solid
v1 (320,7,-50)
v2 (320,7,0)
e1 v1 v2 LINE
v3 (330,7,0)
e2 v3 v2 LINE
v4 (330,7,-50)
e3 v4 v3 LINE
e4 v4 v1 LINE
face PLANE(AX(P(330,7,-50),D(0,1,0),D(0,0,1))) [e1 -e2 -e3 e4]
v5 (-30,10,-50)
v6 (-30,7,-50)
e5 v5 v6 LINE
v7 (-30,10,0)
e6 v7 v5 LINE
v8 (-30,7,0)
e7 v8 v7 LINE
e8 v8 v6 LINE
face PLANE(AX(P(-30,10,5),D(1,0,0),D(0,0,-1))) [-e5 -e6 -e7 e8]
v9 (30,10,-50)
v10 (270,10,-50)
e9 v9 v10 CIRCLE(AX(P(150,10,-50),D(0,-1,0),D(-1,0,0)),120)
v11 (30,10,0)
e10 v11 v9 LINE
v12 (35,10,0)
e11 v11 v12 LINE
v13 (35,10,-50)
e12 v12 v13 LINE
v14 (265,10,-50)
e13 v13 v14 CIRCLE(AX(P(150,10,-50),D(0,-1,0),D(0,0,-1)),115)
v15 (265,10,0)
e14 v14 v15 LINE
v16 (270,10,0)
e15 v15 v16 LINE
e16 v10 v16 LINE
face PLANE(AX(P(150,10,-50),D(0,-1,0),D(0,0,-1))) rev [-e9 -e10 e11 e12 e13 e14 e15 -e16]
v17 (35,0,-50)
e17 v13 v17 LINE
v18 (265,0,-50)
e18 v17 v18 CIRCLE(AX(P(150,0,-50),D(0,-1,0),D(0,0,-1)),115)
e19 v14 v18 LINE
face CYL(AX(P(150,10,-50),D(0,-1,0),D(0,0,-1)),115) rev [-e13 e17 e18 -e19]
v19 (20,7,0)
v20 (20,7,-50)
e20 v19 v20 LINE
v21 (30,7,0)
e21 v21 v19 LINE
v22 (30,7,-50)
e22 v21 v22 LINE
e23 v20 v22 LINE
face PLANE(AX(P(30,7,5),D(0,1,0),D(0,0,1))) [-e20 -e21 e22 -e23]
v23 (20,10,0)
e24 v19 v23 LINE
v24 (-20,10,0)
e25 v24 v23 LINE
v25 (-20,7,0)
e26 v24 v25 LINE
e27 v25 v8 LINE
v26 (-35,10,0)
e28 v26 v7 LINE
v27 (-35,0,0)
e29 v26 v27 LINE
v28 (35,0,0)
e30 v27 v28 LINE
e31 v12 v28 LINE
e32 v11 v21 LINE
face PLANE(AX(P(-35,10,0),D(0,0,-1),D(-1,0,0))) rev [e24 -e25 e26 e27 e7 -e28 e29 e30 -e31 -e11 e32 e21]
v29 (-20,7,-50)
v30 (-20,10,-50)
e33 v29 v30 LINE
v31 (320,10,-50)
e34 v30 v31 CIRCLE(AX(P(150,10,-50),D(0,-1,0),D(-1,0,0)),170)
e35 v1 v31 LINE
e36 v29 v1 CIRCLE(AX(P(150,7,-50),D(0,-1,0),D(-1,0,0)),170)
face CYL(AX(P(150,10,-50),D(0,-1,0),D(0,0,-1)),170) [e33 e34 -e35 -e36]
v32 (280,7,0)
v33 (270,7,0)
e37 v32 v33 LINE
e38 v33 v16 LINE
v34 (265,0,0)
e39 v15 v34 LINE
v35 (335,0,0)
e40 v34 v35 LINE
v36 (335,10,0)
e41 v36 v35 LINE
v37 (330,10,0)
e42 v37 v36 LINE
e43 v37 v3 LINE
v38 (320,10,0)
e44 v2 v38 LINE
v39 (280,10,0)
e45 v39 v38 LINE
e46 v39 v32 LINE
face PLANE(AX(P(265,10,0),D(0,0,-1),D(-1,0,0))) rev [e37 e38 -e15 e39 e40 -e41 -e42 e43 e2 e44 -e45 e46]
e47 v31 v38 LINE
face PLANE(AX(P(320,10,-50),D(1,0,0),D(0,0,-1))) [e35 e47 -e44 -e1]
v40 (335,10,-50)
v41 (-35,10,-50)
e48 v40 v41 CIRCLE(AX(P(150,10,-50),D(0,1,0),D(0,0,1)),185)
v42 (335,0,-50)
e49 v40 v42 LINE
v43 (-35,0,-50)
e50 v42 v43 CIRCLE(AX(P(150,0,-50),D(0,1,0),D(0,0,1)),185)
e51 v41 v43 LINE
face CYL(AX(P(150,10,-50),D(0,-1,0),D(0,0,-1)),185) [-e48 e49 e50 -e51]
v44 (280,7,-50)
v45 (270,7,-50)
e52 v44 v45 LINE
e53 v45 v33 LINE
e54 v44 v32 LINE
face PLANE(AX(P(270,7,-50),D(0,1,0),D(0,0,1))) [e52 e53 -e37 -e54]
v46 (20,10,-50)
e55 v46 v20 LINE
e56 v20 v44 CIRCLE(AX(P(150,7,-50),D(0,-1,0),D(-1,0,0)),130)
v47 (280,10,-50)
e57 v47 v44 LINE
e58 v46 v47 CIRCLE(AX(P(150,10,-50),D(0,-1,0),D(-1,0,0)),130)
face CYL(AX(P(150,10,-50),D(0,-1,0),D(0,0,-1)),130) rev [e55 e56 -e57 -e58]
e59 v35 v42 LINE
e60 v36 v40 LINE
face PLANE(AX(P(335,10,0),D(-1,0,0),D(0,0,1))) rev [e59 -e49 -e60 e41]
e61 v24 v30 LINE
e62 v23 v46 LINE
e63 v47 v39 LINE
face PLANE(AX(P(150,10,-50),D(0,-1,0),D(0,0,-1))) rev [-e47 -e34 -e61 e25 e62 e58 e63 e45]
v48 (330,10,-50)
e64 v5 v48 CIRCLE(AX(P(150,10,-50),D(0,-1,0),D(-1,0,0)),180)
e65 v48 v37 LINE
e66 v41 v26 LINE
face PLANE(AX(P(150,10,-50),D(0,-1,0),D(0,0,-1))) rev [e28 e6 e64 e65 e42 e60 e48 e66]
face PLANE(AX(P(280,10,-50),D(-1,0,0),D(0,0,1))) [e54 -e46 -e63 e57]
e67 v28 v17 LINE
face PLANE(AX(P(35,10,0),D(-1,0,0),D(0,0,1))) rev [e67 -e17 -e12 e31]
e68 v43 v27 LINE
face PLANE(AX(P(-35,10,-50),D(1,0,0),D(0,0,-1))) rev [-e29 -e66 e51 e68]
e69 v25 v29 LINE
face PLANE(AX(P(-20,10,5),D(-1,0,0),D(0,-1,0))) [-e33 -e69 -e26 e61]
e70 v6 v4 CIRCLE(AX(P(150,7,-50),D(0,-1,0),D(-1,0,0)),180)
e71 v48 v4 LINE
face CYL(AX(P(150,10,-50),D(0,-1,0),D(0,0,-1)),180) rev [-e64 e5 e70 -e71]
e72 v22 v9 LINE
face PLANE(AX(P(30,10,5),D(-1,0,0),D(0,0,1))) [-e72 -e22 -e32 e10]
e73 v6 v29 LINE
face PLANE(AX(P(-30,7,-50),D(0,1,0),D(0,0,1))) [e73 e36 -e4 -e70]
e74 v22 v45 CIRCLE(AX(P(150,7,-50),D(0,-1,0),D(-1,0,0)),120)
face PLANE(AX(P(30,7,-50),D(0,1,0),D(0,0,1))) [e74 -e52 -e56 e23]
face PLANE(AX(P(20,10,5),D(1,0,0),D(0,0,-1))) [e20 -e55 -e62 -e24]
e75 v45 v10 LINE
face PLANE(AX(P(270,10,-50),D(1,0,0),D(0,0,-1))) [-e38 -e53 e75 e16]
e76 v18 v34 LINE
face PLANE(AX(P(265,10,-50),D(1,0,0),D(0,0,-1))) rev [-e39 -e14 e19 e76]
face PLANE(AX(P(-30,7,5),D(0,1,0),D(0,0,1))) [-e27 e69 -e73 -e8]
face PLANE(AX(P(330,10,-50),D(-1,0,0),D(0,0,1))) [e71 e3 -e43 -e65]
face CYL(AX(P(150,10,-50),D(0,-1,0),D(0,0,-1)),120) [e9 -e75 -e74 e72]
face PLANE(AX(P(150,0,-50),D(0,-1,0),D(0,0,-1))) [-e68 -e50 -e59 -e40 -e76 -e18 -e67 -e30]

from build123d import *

# Parameters (mm, degrees)
BOSS_EXTRUDE1_DEPTH = 10
CUT_SWEEP1_START    = 7
CUT_SWEEP1_DEPTH    = 3


# Read off the part's stored shape, not the designer's step: Cut-Sweep1
with BuildPart() as part:
    # Sketch1 → Boss-Extrude1 (new body)
    with BuildSketch(Plane(origin=(0, 0, 0), x_dir=(1, 0, 0), z_dir=(0, 1, 0))):
        with BuildLine():
            Line((-35, 0), (35, 0))
            Line((35, 0), (35, 50))
            ThreePointArc((35, 50), (150, 165), (265, 50))
            Line((265, 50), (265, 0))
            Line((265, 0), (335, 0))
            Line((335, 0), (335, 50))
            ThreePointArc((335, 50), (150, 235), (-35, 50))
            Line((-35, 50), (-35, 0))
        make_face()
    extrude(amount=BOSS_EXTRUDE1_DEPTH)

    # Cut-Sweep1 outline → Cut-Sweep1 (cut)
    with BuildSketch(Plane(origin=(0, 0, 0), x_dir=(1, 0, 0), z_dir=(0, 1, 0)).offset(CUT_SWEEP1_START)):
        with BuildLine():
            Line((-30, 50), (-30, 0))
            Line((-30, 0), (-20, 0))
            Line((-20, 0), (-20, 50))
            ThreePointArc((-20, 50), (150, 220), (320, 50))
            Line((320, 50), (320, 0))
            Line((320, 0), (330, 0))
            Line((330, 0), (330, 50))
            ThreePointArc((330, 50), (150, 230), (-30, 50))
        make_face()
        with BuildLine():
            Line((20, 50), (20, 0))
            Line((20, 0), (30, 0))
            Line((30, 0), (30, 50))
            ThreePointArc((30, 50), (150, 170), (270, 50))
            Line((270, 50), (270, 0))
            Line((270, 0), (280, 0))
            Line((280, 0), (280, 50))
            ThreePointArc((280, 50), (150, 180), (20, 50))
        make_face()
    extrude(amount=CUT_SWEEP1_DEPTH, mode=Mode.SUBTRACT)


solid = part.part
